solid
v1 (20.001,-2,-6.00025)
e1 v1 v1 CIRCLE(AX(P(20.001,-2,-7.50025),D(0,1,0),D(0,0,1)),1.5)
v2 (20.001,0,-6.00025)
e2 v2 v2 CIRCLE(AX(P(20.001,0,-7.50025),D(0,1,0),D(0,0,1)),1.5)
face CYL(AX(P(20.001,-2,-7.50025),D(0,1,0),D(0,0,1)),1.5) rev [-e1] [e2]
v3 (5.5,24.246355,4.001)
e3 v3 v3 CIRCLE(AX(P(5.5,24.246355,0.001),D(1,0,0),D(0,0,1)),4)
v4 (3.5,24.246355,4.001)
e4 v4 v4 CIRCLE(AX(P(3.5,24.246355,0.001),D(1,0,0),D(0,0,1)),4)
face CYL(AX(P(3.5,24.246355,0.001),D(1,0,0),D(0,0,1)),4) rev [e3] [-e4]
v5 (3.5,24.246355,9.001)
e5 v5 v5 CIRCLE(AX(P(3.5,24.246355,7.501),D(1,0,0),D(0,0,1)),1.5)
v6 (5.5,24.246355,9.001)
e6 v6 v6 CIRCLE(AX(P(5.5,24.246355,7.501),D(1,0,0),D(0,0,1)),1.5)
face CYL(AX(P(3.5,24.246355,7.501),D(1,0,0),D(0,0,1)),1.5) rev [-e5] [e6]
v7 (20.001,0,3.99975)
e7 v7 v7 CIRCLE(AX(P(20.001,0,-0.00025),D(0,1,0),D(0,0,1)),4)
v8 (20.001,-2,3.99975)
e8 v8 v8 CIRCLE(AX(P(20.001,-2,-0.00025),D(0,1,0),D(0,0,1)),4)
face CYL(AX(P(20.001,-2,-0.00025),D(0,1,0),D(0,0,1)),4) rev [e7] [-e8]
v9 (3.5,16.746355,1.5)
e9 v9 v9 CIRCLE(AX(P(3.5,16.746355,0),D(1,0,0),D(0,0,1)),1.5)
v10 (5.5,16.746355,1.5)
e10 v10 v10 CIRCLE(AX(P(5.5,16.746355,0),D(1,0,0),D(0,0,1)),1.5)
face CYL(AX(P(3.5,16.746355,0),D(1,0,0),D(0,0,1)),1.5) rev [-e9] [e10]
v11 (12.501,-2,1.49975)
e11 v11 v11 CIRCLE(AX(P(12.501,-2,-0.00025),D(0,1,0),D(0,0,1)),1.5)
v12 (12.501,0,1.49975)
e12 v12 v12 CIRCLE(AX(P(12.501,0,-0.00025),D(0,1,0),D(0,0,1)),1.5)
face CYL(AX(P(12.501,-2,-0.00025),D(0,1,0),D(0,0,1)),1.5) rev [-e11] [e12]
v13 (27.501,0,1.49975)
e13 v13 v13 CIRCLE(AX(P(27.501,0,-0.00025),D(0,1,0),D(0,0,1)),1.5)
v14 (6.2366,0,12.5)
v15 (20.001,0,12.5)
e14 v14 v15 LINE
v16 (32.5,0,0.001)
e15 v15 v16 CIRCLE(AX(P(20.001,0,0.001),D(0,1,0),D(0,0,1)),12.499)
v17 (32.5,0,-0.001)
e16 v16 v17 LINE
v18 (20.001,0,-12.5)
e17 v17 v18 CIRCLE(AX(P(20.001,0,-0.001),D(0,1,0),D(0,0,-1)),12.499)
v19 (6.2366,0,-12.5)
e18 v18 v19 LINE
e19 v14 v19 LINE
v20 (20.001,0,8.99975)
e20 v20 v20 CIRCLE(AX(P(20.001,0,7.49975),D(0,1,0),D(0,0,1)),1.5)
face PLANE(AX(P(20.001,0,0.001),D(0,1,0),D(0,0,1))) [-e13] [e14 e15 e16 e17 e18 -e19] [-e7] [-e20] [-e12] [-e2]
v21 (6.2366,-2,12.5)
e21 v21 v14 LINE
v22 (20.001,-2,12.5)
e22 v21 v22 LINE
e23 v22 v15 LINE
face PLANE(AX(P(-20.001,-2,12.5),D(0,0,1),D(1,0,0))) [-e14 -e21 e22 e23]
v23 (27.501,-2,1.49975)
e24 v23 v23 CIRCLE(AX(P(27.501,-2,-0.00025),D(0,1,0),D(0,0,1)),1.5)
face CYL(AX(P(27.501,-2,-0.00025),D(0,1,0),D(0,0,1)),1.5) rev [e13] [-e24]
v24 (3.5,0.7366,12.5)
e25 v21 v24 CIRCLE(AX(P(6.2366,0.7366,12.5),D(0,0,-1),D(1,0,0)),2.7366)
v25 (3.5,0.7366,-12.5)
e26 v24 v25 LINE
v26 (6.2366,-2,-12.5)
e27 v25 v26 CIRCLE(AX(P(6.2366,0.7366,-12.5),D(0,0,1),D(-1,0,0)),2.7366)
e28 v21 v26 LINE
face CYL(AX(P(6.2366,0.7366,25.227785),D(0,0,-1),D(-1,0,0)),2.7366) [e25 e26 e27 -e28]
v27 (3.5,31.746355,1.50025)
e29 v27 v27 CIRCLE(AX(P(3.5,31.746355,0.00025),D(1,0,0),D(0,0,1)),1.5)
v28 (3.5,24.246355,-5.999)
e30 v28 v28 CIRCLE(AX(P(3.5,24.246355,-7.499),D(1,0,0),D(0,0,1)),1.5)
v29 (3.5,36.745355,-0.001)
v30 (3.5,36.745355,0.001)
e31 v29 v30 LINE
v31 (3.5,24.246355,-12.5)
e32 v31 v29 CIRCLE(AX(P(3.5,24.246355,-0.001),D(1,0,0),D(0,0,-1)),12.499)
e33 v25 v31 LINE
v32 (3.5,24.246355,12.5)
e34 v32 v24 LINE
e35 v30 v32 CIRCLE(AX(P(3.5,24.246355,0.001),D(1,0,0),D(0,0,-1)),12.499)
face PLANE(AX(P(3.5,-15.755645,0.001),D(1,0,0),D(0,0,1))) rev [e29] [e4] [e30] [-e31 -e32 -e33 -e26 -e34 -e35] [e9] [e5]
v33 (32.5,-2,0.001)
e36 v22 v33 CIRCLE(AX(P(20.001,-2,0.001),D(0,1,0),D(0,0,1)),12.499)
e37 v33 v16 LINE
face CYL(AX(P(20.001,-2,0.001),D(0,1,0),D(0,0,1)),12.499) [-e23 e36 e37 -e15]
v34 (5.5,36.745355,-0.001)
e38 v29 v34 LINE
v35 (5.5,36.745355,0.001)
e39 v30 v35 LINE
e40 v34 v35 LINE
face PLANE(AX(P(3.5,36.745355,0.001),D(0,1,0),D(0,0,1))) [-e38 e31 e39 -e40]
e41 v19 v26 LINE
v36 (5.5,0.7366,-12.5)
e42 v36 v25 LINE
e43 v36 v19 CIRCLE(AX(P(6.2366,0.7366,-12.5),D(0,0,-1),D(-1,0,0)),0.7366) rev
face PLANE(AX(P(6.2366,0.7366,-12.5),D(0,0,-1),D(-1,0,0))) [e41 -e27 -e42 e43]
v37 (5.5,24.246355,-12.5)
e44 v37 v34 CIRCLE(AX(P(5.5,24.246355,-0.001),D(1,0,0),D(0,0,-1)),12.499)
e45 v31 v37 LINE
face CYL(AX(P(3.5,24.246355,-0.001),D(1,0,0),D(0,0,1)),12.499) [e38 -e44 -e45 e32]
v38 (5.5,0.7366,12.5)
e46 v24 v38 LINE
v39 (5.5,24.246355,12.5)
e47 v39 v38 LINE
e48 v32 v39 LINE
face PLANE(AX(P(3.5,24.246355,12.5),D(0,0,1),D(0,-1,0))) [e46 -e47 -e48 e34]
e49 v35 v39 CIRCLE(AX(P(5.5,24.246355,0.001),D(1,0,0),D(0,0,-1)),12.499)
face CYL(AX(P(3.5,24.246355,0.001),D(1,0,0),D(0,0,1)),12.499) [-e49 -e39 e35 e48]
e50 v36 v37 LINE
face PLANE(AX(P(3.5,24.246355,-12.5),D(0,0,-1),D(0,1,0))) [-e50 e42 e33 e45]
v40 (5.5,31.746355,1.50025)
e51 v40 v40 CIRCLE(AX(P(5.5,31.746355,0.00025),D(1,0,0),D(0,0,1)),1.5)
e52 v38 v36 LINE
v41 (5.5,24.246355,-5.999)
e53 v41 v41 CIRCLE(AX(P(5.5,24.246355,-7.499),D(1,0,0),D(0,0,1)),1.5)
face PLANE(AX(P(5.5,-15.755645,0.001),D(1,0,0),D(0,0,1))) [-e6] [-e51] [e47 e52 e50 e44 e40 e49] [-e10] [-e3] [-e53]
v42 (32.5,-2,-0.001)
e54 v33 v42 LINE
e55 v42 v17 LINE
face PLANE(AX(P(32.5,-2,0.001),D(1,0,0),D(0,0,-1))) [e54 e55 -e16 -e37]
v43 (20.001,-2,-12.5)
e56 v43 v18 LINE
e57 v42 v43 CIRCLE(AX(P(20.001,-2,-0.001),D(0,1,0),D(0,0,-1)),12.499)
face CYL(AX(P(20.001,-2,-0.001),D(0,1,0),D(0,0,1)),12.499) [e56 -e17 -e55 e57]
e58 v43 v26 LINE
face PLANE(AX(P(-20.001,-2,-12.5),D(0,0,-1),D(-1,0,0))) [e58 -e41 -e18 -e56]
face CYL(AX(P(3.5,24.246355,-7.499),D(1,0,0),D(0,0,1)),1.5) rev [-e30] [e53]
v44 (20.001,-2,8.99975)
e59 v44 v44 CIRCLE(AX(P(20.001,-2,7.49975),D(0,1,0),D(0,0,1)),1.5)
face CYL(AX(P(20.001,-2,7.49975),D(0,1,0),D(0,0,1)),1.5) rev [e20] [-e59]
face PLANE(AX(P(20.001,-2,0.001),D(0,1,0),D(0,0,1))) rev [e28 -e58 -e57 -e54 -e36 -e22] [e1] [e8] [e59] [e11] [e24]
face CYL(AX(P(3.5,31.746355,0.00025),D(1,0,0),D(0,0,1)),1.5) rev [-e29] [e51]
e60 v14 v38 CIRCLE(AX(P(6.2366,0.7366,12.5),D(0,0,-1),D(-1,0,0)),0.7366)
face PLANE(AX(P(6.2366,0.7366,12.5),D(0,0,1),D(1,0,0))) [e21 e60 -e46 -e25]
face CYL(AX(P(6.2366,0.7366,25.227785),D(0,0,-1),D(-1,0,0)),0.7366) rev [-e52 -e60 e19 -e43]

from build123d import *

# Parameters (mm, degrees)
SKETCH1_R                    = 1.5
SKETCH1_R_2                  = 4
BASE_FLANGE1_DEPTH           = 2
SKETCHED_START               = -32.5
SKETCHED_BEND1_OUTLINE_W     = 2
SKETCHED_BEND1_OUTLINE_H     = 25
SKETCHED_BEND1_DEPTH         = 36
SKETCHED_START_2             = 3.766161716
SKETCHED_BEND1_2_OUTLINE_R   = 1.5
SKETCHED_BEND1_2_OUTLINE_R_2 = 4
SKETCHED_BEND1_2_DEPTH       = 1.733838284
SKETCHED_START_3             = 3.5
SKETCHED_BEND1_3_OUTLINE_R   = 1.5
SKETCHED_BEND1_3_OUTLINE_R_2 = 4
SKETCHED_BEND1_3_DEPTH       = 2.7366
SKETCHED_START_4             = -12.5
SKETCHED_BEND1_4_DEPTH       = 25


with BuildPart() as part:
    # Base-Flange1: sheet metal written as solids
    # Sketch1 → Base-Flange1 (new body)
    with BuildSketch(Plane(origin=(0, 0, 0), x_dir=(1, 0, 0), z_dir=(0, 1, 0))):
        with BuildLine():
            Line((-32.5, -0.001), (-32.5, 0.001))
            ThreePointArc((-32.5, 0.001), (-28.839127658, 8.839127658), (-20.001, 12.5))
            Line((-20.001, 12.5), (20.001, 12.5))
            ThreePointArc((20.001, 12.5), (28.839127658, 8.839127658), (32.5, 0.001))
            Line((32.5, 0.001), (32.5, -0.001))
            ThreePointArc((32.5, -0.001), (28.839127658, -8.839127658), (20.001, -12.5))
            Line((20.001, -12.5), (-20.001, -12.5))
            ThreePointArc((-20.001, -12.5), (-28.839127658, -8.839127658), (-32.5, -0.001))
        make_face()
        with Locations(Location((12.501, 0.000250009, 0), (0, 0, 270))):
            Circle(SKETCH1_R, mode=Mode.SUBTRACT)
        with Locations(Location((20.001, 0.000250009, 0), (0, 0, 270))):
            Circle(SKETCH1_R_2, mode=Mode.SUBTRACT)
        with Locations(Location((20.001, -7.499749991, 0), (0, 0, 270))):
            Circle(SKETCH1_R, mode=Mode.SUBTRACT)
        with Locations(Location((27.501, 0.000250009, 0), (0, 0, 270))):
            Circle(SKETCH1_R, mode=Mode.SUBTRACT)
        with Locations(Location((20.001, 7.500250009, 0), (0, 0, 270))):
            Circle(SKETCH1_R, mode=Mode.SUBTRACT)
        with Locations(Location((-20.001, 7.499, 0), (0, 0, 270))):
            Circle(SKETCH1_R, mode=Mode.SUBTRACT)
        with Locations(Location((-27.500999963, -0.000250009, 0), (0, 0, 270))):
            Circle(SKETCH1_R, mode=Mode.SUBTRACT)
        with Locations(Location((-12.501000067, 0, 0), (0, 0, 270))):
            Circle(SKETCH1_R, mode=Mode.SUBTRACT)
        with Locations(Location((-20.001, -7.501, 0), (0, 0, 270))):
            Circle(SKETCH1_R, mode=Mode.SUBTRACT)
        with Locations(Location((-20.001, -0.001, 0), (0, 0, 270))):
            Circle(SKETCH1_R_2, mode=Mode.SUBTRACT)
    extrude(amount=-BASE_FLANGE1_DEPTH)

    # Sketched Bend1: read off the stored shape, not the designer's step
    # Sketched Bend1 outline → Sketched Bend1 (cut)
    with BuildSketch(Plane.YZ.offset(SKETCHED_START)):
        with Locations((-1, 0)):
            Rectangle(SKETCHED_BEND1_OUTLINE_W, SKETCHED_BEND1_OUTLINE_H)
    extrude(amount=SKETCHED_BEND1_DEPTH, mode=Mode.SUBTRACT)

    # Sketched Bend1 2 outline → Sketched Bend1 2 (add)
    with BuildSketch(Plane.YZ.offset(SKETCHED_START_2)):
        with BuildLine():
            ThreePointArc((36.745355099, 0.001), (33.084482757, 8.839127658), (24.246355099, 12.5))
            Line((24.246355099, 12.5), (0, 12.5))
            Line((0, 12.5), (0, -12.5))
            Line((0, -12.5), (24.246355099, -12.5))
            ThreePointArc((24.246355099, -12.5), (33.084482757, -8.839127658), (36.745355099, -0.001))
            Line((36.745355099, -0.001), (36.745355099, 0.001))
        make_face()
        with Locations((24.246355099, -7.499)):
            Circle(SKETCHED_BEND1_2_OUTLINE_R, mode=Mode.SUBTRACT)
        with Locations((16.746355166, 0)):
            Circle(SKETCHED_BEND1_2_OUTLINE_R, mode=Mode.SUBTRACT)
        with Locations((24.246355099, 0.001)):
            Circle(SKETCHED_BEND1_2_OUTLINE_R_2, mode=Mode.SUBTRACT)
        with Locations((31.746355061, 0.000250009)):
            Circle(SKETCHED_BEND1_2_OUTLINE_R, mode=Mode.SUBTRACT)
        with Locations((24.246355099, 7.501)):
            Circle(SKETCHED_BEND1_2_OUTLINE_R, mode=Mode.SUBTRACT)
    extrude(amount=SKETCHED_BEND1_2_DEPTH)

    # Sketched Bend1 3 outline → Sketched Bend1 3 (add)
    with BuildSketch(Plane.YZ.offset(SKETCHED_START_3)):
        with BuildLine():
            ThreePointArc((36.745355099, 0.001), (33.084482757, 8.839127658), (24.246355099, 12.5))
            Line((24.246355099, 12.5), (0, 12.5))
            Line((0, 12.5), (0, -12.5))
            Line((0, -12.5), (24.246355099, -12.5))
            ThreePointArc((24.246355099, -12.5), (33.084482757, -8.839127658), (36.745355099, -0.001))
            Line((36.745355099, -0.001), (36.745355099, 0.001))
        make_face()
        with Locations((24.246355099, -7.499)):
            Circle(SKETCHED_BEND1_3_OUTLINE_R, mode=Mode.SUBTRACT)
        with Locations((16.746355166, 0)):
            Circle(SKETCHED_BEND1_3_OUTLINE_R, mode=Mode.SUBTRACT)
        with Locations((24.246355099, 0.001)):
            Circle(SKETCHED_BEND1_3_OUTLINE_R_2, mode=Mode.SUBTRACT)
        with Locations((31.746355061, 0.000250009)):
            Circle(SKETCHED_BEND1_3_OUTLINE_R, mode=Mode.SUBTRACT)
        with Locations((24.246355099, 7.501)):
            Circle(SKETCHED_BEND1_3_OUTLINE_R, mode=Mode.SUBTRACT)
    extrude(amount=SKETCHED_BEND1_3_DEPTH)

    # Sketched Bend1 4 outline → Sketched Bend1 4 (cut)
    with BuildSketch(Plane.XY.offset(SKETCHED_START_4)):
        with BuildLine():
            ThreePointArc((6.2366, -2), (4.301531583, -1.198468417), (3.5, 0.7366))
            Line((3.5, 0.7366), (3.5, -2))
            Line((3.5, -2), (6.2366, -2))
        make_face()
        with BuildLine():
            Line((5.5, 36.745355099), (5.5, 0.7366))
            ThreePointArc((5.5, 0.7366), (5.715745145, 0.215745145), (6.2366, 0))
            Line((6.2366, 0), (6.2366, 36.745355099))
            Line((6.2366, 36.745355099), (5.5, 36.745355099))
        make_face()
    extrude(amount=SKETCHED_BEND1_4_DEPTH, mode=Mode.SUBTRACT)


solid = part.part
